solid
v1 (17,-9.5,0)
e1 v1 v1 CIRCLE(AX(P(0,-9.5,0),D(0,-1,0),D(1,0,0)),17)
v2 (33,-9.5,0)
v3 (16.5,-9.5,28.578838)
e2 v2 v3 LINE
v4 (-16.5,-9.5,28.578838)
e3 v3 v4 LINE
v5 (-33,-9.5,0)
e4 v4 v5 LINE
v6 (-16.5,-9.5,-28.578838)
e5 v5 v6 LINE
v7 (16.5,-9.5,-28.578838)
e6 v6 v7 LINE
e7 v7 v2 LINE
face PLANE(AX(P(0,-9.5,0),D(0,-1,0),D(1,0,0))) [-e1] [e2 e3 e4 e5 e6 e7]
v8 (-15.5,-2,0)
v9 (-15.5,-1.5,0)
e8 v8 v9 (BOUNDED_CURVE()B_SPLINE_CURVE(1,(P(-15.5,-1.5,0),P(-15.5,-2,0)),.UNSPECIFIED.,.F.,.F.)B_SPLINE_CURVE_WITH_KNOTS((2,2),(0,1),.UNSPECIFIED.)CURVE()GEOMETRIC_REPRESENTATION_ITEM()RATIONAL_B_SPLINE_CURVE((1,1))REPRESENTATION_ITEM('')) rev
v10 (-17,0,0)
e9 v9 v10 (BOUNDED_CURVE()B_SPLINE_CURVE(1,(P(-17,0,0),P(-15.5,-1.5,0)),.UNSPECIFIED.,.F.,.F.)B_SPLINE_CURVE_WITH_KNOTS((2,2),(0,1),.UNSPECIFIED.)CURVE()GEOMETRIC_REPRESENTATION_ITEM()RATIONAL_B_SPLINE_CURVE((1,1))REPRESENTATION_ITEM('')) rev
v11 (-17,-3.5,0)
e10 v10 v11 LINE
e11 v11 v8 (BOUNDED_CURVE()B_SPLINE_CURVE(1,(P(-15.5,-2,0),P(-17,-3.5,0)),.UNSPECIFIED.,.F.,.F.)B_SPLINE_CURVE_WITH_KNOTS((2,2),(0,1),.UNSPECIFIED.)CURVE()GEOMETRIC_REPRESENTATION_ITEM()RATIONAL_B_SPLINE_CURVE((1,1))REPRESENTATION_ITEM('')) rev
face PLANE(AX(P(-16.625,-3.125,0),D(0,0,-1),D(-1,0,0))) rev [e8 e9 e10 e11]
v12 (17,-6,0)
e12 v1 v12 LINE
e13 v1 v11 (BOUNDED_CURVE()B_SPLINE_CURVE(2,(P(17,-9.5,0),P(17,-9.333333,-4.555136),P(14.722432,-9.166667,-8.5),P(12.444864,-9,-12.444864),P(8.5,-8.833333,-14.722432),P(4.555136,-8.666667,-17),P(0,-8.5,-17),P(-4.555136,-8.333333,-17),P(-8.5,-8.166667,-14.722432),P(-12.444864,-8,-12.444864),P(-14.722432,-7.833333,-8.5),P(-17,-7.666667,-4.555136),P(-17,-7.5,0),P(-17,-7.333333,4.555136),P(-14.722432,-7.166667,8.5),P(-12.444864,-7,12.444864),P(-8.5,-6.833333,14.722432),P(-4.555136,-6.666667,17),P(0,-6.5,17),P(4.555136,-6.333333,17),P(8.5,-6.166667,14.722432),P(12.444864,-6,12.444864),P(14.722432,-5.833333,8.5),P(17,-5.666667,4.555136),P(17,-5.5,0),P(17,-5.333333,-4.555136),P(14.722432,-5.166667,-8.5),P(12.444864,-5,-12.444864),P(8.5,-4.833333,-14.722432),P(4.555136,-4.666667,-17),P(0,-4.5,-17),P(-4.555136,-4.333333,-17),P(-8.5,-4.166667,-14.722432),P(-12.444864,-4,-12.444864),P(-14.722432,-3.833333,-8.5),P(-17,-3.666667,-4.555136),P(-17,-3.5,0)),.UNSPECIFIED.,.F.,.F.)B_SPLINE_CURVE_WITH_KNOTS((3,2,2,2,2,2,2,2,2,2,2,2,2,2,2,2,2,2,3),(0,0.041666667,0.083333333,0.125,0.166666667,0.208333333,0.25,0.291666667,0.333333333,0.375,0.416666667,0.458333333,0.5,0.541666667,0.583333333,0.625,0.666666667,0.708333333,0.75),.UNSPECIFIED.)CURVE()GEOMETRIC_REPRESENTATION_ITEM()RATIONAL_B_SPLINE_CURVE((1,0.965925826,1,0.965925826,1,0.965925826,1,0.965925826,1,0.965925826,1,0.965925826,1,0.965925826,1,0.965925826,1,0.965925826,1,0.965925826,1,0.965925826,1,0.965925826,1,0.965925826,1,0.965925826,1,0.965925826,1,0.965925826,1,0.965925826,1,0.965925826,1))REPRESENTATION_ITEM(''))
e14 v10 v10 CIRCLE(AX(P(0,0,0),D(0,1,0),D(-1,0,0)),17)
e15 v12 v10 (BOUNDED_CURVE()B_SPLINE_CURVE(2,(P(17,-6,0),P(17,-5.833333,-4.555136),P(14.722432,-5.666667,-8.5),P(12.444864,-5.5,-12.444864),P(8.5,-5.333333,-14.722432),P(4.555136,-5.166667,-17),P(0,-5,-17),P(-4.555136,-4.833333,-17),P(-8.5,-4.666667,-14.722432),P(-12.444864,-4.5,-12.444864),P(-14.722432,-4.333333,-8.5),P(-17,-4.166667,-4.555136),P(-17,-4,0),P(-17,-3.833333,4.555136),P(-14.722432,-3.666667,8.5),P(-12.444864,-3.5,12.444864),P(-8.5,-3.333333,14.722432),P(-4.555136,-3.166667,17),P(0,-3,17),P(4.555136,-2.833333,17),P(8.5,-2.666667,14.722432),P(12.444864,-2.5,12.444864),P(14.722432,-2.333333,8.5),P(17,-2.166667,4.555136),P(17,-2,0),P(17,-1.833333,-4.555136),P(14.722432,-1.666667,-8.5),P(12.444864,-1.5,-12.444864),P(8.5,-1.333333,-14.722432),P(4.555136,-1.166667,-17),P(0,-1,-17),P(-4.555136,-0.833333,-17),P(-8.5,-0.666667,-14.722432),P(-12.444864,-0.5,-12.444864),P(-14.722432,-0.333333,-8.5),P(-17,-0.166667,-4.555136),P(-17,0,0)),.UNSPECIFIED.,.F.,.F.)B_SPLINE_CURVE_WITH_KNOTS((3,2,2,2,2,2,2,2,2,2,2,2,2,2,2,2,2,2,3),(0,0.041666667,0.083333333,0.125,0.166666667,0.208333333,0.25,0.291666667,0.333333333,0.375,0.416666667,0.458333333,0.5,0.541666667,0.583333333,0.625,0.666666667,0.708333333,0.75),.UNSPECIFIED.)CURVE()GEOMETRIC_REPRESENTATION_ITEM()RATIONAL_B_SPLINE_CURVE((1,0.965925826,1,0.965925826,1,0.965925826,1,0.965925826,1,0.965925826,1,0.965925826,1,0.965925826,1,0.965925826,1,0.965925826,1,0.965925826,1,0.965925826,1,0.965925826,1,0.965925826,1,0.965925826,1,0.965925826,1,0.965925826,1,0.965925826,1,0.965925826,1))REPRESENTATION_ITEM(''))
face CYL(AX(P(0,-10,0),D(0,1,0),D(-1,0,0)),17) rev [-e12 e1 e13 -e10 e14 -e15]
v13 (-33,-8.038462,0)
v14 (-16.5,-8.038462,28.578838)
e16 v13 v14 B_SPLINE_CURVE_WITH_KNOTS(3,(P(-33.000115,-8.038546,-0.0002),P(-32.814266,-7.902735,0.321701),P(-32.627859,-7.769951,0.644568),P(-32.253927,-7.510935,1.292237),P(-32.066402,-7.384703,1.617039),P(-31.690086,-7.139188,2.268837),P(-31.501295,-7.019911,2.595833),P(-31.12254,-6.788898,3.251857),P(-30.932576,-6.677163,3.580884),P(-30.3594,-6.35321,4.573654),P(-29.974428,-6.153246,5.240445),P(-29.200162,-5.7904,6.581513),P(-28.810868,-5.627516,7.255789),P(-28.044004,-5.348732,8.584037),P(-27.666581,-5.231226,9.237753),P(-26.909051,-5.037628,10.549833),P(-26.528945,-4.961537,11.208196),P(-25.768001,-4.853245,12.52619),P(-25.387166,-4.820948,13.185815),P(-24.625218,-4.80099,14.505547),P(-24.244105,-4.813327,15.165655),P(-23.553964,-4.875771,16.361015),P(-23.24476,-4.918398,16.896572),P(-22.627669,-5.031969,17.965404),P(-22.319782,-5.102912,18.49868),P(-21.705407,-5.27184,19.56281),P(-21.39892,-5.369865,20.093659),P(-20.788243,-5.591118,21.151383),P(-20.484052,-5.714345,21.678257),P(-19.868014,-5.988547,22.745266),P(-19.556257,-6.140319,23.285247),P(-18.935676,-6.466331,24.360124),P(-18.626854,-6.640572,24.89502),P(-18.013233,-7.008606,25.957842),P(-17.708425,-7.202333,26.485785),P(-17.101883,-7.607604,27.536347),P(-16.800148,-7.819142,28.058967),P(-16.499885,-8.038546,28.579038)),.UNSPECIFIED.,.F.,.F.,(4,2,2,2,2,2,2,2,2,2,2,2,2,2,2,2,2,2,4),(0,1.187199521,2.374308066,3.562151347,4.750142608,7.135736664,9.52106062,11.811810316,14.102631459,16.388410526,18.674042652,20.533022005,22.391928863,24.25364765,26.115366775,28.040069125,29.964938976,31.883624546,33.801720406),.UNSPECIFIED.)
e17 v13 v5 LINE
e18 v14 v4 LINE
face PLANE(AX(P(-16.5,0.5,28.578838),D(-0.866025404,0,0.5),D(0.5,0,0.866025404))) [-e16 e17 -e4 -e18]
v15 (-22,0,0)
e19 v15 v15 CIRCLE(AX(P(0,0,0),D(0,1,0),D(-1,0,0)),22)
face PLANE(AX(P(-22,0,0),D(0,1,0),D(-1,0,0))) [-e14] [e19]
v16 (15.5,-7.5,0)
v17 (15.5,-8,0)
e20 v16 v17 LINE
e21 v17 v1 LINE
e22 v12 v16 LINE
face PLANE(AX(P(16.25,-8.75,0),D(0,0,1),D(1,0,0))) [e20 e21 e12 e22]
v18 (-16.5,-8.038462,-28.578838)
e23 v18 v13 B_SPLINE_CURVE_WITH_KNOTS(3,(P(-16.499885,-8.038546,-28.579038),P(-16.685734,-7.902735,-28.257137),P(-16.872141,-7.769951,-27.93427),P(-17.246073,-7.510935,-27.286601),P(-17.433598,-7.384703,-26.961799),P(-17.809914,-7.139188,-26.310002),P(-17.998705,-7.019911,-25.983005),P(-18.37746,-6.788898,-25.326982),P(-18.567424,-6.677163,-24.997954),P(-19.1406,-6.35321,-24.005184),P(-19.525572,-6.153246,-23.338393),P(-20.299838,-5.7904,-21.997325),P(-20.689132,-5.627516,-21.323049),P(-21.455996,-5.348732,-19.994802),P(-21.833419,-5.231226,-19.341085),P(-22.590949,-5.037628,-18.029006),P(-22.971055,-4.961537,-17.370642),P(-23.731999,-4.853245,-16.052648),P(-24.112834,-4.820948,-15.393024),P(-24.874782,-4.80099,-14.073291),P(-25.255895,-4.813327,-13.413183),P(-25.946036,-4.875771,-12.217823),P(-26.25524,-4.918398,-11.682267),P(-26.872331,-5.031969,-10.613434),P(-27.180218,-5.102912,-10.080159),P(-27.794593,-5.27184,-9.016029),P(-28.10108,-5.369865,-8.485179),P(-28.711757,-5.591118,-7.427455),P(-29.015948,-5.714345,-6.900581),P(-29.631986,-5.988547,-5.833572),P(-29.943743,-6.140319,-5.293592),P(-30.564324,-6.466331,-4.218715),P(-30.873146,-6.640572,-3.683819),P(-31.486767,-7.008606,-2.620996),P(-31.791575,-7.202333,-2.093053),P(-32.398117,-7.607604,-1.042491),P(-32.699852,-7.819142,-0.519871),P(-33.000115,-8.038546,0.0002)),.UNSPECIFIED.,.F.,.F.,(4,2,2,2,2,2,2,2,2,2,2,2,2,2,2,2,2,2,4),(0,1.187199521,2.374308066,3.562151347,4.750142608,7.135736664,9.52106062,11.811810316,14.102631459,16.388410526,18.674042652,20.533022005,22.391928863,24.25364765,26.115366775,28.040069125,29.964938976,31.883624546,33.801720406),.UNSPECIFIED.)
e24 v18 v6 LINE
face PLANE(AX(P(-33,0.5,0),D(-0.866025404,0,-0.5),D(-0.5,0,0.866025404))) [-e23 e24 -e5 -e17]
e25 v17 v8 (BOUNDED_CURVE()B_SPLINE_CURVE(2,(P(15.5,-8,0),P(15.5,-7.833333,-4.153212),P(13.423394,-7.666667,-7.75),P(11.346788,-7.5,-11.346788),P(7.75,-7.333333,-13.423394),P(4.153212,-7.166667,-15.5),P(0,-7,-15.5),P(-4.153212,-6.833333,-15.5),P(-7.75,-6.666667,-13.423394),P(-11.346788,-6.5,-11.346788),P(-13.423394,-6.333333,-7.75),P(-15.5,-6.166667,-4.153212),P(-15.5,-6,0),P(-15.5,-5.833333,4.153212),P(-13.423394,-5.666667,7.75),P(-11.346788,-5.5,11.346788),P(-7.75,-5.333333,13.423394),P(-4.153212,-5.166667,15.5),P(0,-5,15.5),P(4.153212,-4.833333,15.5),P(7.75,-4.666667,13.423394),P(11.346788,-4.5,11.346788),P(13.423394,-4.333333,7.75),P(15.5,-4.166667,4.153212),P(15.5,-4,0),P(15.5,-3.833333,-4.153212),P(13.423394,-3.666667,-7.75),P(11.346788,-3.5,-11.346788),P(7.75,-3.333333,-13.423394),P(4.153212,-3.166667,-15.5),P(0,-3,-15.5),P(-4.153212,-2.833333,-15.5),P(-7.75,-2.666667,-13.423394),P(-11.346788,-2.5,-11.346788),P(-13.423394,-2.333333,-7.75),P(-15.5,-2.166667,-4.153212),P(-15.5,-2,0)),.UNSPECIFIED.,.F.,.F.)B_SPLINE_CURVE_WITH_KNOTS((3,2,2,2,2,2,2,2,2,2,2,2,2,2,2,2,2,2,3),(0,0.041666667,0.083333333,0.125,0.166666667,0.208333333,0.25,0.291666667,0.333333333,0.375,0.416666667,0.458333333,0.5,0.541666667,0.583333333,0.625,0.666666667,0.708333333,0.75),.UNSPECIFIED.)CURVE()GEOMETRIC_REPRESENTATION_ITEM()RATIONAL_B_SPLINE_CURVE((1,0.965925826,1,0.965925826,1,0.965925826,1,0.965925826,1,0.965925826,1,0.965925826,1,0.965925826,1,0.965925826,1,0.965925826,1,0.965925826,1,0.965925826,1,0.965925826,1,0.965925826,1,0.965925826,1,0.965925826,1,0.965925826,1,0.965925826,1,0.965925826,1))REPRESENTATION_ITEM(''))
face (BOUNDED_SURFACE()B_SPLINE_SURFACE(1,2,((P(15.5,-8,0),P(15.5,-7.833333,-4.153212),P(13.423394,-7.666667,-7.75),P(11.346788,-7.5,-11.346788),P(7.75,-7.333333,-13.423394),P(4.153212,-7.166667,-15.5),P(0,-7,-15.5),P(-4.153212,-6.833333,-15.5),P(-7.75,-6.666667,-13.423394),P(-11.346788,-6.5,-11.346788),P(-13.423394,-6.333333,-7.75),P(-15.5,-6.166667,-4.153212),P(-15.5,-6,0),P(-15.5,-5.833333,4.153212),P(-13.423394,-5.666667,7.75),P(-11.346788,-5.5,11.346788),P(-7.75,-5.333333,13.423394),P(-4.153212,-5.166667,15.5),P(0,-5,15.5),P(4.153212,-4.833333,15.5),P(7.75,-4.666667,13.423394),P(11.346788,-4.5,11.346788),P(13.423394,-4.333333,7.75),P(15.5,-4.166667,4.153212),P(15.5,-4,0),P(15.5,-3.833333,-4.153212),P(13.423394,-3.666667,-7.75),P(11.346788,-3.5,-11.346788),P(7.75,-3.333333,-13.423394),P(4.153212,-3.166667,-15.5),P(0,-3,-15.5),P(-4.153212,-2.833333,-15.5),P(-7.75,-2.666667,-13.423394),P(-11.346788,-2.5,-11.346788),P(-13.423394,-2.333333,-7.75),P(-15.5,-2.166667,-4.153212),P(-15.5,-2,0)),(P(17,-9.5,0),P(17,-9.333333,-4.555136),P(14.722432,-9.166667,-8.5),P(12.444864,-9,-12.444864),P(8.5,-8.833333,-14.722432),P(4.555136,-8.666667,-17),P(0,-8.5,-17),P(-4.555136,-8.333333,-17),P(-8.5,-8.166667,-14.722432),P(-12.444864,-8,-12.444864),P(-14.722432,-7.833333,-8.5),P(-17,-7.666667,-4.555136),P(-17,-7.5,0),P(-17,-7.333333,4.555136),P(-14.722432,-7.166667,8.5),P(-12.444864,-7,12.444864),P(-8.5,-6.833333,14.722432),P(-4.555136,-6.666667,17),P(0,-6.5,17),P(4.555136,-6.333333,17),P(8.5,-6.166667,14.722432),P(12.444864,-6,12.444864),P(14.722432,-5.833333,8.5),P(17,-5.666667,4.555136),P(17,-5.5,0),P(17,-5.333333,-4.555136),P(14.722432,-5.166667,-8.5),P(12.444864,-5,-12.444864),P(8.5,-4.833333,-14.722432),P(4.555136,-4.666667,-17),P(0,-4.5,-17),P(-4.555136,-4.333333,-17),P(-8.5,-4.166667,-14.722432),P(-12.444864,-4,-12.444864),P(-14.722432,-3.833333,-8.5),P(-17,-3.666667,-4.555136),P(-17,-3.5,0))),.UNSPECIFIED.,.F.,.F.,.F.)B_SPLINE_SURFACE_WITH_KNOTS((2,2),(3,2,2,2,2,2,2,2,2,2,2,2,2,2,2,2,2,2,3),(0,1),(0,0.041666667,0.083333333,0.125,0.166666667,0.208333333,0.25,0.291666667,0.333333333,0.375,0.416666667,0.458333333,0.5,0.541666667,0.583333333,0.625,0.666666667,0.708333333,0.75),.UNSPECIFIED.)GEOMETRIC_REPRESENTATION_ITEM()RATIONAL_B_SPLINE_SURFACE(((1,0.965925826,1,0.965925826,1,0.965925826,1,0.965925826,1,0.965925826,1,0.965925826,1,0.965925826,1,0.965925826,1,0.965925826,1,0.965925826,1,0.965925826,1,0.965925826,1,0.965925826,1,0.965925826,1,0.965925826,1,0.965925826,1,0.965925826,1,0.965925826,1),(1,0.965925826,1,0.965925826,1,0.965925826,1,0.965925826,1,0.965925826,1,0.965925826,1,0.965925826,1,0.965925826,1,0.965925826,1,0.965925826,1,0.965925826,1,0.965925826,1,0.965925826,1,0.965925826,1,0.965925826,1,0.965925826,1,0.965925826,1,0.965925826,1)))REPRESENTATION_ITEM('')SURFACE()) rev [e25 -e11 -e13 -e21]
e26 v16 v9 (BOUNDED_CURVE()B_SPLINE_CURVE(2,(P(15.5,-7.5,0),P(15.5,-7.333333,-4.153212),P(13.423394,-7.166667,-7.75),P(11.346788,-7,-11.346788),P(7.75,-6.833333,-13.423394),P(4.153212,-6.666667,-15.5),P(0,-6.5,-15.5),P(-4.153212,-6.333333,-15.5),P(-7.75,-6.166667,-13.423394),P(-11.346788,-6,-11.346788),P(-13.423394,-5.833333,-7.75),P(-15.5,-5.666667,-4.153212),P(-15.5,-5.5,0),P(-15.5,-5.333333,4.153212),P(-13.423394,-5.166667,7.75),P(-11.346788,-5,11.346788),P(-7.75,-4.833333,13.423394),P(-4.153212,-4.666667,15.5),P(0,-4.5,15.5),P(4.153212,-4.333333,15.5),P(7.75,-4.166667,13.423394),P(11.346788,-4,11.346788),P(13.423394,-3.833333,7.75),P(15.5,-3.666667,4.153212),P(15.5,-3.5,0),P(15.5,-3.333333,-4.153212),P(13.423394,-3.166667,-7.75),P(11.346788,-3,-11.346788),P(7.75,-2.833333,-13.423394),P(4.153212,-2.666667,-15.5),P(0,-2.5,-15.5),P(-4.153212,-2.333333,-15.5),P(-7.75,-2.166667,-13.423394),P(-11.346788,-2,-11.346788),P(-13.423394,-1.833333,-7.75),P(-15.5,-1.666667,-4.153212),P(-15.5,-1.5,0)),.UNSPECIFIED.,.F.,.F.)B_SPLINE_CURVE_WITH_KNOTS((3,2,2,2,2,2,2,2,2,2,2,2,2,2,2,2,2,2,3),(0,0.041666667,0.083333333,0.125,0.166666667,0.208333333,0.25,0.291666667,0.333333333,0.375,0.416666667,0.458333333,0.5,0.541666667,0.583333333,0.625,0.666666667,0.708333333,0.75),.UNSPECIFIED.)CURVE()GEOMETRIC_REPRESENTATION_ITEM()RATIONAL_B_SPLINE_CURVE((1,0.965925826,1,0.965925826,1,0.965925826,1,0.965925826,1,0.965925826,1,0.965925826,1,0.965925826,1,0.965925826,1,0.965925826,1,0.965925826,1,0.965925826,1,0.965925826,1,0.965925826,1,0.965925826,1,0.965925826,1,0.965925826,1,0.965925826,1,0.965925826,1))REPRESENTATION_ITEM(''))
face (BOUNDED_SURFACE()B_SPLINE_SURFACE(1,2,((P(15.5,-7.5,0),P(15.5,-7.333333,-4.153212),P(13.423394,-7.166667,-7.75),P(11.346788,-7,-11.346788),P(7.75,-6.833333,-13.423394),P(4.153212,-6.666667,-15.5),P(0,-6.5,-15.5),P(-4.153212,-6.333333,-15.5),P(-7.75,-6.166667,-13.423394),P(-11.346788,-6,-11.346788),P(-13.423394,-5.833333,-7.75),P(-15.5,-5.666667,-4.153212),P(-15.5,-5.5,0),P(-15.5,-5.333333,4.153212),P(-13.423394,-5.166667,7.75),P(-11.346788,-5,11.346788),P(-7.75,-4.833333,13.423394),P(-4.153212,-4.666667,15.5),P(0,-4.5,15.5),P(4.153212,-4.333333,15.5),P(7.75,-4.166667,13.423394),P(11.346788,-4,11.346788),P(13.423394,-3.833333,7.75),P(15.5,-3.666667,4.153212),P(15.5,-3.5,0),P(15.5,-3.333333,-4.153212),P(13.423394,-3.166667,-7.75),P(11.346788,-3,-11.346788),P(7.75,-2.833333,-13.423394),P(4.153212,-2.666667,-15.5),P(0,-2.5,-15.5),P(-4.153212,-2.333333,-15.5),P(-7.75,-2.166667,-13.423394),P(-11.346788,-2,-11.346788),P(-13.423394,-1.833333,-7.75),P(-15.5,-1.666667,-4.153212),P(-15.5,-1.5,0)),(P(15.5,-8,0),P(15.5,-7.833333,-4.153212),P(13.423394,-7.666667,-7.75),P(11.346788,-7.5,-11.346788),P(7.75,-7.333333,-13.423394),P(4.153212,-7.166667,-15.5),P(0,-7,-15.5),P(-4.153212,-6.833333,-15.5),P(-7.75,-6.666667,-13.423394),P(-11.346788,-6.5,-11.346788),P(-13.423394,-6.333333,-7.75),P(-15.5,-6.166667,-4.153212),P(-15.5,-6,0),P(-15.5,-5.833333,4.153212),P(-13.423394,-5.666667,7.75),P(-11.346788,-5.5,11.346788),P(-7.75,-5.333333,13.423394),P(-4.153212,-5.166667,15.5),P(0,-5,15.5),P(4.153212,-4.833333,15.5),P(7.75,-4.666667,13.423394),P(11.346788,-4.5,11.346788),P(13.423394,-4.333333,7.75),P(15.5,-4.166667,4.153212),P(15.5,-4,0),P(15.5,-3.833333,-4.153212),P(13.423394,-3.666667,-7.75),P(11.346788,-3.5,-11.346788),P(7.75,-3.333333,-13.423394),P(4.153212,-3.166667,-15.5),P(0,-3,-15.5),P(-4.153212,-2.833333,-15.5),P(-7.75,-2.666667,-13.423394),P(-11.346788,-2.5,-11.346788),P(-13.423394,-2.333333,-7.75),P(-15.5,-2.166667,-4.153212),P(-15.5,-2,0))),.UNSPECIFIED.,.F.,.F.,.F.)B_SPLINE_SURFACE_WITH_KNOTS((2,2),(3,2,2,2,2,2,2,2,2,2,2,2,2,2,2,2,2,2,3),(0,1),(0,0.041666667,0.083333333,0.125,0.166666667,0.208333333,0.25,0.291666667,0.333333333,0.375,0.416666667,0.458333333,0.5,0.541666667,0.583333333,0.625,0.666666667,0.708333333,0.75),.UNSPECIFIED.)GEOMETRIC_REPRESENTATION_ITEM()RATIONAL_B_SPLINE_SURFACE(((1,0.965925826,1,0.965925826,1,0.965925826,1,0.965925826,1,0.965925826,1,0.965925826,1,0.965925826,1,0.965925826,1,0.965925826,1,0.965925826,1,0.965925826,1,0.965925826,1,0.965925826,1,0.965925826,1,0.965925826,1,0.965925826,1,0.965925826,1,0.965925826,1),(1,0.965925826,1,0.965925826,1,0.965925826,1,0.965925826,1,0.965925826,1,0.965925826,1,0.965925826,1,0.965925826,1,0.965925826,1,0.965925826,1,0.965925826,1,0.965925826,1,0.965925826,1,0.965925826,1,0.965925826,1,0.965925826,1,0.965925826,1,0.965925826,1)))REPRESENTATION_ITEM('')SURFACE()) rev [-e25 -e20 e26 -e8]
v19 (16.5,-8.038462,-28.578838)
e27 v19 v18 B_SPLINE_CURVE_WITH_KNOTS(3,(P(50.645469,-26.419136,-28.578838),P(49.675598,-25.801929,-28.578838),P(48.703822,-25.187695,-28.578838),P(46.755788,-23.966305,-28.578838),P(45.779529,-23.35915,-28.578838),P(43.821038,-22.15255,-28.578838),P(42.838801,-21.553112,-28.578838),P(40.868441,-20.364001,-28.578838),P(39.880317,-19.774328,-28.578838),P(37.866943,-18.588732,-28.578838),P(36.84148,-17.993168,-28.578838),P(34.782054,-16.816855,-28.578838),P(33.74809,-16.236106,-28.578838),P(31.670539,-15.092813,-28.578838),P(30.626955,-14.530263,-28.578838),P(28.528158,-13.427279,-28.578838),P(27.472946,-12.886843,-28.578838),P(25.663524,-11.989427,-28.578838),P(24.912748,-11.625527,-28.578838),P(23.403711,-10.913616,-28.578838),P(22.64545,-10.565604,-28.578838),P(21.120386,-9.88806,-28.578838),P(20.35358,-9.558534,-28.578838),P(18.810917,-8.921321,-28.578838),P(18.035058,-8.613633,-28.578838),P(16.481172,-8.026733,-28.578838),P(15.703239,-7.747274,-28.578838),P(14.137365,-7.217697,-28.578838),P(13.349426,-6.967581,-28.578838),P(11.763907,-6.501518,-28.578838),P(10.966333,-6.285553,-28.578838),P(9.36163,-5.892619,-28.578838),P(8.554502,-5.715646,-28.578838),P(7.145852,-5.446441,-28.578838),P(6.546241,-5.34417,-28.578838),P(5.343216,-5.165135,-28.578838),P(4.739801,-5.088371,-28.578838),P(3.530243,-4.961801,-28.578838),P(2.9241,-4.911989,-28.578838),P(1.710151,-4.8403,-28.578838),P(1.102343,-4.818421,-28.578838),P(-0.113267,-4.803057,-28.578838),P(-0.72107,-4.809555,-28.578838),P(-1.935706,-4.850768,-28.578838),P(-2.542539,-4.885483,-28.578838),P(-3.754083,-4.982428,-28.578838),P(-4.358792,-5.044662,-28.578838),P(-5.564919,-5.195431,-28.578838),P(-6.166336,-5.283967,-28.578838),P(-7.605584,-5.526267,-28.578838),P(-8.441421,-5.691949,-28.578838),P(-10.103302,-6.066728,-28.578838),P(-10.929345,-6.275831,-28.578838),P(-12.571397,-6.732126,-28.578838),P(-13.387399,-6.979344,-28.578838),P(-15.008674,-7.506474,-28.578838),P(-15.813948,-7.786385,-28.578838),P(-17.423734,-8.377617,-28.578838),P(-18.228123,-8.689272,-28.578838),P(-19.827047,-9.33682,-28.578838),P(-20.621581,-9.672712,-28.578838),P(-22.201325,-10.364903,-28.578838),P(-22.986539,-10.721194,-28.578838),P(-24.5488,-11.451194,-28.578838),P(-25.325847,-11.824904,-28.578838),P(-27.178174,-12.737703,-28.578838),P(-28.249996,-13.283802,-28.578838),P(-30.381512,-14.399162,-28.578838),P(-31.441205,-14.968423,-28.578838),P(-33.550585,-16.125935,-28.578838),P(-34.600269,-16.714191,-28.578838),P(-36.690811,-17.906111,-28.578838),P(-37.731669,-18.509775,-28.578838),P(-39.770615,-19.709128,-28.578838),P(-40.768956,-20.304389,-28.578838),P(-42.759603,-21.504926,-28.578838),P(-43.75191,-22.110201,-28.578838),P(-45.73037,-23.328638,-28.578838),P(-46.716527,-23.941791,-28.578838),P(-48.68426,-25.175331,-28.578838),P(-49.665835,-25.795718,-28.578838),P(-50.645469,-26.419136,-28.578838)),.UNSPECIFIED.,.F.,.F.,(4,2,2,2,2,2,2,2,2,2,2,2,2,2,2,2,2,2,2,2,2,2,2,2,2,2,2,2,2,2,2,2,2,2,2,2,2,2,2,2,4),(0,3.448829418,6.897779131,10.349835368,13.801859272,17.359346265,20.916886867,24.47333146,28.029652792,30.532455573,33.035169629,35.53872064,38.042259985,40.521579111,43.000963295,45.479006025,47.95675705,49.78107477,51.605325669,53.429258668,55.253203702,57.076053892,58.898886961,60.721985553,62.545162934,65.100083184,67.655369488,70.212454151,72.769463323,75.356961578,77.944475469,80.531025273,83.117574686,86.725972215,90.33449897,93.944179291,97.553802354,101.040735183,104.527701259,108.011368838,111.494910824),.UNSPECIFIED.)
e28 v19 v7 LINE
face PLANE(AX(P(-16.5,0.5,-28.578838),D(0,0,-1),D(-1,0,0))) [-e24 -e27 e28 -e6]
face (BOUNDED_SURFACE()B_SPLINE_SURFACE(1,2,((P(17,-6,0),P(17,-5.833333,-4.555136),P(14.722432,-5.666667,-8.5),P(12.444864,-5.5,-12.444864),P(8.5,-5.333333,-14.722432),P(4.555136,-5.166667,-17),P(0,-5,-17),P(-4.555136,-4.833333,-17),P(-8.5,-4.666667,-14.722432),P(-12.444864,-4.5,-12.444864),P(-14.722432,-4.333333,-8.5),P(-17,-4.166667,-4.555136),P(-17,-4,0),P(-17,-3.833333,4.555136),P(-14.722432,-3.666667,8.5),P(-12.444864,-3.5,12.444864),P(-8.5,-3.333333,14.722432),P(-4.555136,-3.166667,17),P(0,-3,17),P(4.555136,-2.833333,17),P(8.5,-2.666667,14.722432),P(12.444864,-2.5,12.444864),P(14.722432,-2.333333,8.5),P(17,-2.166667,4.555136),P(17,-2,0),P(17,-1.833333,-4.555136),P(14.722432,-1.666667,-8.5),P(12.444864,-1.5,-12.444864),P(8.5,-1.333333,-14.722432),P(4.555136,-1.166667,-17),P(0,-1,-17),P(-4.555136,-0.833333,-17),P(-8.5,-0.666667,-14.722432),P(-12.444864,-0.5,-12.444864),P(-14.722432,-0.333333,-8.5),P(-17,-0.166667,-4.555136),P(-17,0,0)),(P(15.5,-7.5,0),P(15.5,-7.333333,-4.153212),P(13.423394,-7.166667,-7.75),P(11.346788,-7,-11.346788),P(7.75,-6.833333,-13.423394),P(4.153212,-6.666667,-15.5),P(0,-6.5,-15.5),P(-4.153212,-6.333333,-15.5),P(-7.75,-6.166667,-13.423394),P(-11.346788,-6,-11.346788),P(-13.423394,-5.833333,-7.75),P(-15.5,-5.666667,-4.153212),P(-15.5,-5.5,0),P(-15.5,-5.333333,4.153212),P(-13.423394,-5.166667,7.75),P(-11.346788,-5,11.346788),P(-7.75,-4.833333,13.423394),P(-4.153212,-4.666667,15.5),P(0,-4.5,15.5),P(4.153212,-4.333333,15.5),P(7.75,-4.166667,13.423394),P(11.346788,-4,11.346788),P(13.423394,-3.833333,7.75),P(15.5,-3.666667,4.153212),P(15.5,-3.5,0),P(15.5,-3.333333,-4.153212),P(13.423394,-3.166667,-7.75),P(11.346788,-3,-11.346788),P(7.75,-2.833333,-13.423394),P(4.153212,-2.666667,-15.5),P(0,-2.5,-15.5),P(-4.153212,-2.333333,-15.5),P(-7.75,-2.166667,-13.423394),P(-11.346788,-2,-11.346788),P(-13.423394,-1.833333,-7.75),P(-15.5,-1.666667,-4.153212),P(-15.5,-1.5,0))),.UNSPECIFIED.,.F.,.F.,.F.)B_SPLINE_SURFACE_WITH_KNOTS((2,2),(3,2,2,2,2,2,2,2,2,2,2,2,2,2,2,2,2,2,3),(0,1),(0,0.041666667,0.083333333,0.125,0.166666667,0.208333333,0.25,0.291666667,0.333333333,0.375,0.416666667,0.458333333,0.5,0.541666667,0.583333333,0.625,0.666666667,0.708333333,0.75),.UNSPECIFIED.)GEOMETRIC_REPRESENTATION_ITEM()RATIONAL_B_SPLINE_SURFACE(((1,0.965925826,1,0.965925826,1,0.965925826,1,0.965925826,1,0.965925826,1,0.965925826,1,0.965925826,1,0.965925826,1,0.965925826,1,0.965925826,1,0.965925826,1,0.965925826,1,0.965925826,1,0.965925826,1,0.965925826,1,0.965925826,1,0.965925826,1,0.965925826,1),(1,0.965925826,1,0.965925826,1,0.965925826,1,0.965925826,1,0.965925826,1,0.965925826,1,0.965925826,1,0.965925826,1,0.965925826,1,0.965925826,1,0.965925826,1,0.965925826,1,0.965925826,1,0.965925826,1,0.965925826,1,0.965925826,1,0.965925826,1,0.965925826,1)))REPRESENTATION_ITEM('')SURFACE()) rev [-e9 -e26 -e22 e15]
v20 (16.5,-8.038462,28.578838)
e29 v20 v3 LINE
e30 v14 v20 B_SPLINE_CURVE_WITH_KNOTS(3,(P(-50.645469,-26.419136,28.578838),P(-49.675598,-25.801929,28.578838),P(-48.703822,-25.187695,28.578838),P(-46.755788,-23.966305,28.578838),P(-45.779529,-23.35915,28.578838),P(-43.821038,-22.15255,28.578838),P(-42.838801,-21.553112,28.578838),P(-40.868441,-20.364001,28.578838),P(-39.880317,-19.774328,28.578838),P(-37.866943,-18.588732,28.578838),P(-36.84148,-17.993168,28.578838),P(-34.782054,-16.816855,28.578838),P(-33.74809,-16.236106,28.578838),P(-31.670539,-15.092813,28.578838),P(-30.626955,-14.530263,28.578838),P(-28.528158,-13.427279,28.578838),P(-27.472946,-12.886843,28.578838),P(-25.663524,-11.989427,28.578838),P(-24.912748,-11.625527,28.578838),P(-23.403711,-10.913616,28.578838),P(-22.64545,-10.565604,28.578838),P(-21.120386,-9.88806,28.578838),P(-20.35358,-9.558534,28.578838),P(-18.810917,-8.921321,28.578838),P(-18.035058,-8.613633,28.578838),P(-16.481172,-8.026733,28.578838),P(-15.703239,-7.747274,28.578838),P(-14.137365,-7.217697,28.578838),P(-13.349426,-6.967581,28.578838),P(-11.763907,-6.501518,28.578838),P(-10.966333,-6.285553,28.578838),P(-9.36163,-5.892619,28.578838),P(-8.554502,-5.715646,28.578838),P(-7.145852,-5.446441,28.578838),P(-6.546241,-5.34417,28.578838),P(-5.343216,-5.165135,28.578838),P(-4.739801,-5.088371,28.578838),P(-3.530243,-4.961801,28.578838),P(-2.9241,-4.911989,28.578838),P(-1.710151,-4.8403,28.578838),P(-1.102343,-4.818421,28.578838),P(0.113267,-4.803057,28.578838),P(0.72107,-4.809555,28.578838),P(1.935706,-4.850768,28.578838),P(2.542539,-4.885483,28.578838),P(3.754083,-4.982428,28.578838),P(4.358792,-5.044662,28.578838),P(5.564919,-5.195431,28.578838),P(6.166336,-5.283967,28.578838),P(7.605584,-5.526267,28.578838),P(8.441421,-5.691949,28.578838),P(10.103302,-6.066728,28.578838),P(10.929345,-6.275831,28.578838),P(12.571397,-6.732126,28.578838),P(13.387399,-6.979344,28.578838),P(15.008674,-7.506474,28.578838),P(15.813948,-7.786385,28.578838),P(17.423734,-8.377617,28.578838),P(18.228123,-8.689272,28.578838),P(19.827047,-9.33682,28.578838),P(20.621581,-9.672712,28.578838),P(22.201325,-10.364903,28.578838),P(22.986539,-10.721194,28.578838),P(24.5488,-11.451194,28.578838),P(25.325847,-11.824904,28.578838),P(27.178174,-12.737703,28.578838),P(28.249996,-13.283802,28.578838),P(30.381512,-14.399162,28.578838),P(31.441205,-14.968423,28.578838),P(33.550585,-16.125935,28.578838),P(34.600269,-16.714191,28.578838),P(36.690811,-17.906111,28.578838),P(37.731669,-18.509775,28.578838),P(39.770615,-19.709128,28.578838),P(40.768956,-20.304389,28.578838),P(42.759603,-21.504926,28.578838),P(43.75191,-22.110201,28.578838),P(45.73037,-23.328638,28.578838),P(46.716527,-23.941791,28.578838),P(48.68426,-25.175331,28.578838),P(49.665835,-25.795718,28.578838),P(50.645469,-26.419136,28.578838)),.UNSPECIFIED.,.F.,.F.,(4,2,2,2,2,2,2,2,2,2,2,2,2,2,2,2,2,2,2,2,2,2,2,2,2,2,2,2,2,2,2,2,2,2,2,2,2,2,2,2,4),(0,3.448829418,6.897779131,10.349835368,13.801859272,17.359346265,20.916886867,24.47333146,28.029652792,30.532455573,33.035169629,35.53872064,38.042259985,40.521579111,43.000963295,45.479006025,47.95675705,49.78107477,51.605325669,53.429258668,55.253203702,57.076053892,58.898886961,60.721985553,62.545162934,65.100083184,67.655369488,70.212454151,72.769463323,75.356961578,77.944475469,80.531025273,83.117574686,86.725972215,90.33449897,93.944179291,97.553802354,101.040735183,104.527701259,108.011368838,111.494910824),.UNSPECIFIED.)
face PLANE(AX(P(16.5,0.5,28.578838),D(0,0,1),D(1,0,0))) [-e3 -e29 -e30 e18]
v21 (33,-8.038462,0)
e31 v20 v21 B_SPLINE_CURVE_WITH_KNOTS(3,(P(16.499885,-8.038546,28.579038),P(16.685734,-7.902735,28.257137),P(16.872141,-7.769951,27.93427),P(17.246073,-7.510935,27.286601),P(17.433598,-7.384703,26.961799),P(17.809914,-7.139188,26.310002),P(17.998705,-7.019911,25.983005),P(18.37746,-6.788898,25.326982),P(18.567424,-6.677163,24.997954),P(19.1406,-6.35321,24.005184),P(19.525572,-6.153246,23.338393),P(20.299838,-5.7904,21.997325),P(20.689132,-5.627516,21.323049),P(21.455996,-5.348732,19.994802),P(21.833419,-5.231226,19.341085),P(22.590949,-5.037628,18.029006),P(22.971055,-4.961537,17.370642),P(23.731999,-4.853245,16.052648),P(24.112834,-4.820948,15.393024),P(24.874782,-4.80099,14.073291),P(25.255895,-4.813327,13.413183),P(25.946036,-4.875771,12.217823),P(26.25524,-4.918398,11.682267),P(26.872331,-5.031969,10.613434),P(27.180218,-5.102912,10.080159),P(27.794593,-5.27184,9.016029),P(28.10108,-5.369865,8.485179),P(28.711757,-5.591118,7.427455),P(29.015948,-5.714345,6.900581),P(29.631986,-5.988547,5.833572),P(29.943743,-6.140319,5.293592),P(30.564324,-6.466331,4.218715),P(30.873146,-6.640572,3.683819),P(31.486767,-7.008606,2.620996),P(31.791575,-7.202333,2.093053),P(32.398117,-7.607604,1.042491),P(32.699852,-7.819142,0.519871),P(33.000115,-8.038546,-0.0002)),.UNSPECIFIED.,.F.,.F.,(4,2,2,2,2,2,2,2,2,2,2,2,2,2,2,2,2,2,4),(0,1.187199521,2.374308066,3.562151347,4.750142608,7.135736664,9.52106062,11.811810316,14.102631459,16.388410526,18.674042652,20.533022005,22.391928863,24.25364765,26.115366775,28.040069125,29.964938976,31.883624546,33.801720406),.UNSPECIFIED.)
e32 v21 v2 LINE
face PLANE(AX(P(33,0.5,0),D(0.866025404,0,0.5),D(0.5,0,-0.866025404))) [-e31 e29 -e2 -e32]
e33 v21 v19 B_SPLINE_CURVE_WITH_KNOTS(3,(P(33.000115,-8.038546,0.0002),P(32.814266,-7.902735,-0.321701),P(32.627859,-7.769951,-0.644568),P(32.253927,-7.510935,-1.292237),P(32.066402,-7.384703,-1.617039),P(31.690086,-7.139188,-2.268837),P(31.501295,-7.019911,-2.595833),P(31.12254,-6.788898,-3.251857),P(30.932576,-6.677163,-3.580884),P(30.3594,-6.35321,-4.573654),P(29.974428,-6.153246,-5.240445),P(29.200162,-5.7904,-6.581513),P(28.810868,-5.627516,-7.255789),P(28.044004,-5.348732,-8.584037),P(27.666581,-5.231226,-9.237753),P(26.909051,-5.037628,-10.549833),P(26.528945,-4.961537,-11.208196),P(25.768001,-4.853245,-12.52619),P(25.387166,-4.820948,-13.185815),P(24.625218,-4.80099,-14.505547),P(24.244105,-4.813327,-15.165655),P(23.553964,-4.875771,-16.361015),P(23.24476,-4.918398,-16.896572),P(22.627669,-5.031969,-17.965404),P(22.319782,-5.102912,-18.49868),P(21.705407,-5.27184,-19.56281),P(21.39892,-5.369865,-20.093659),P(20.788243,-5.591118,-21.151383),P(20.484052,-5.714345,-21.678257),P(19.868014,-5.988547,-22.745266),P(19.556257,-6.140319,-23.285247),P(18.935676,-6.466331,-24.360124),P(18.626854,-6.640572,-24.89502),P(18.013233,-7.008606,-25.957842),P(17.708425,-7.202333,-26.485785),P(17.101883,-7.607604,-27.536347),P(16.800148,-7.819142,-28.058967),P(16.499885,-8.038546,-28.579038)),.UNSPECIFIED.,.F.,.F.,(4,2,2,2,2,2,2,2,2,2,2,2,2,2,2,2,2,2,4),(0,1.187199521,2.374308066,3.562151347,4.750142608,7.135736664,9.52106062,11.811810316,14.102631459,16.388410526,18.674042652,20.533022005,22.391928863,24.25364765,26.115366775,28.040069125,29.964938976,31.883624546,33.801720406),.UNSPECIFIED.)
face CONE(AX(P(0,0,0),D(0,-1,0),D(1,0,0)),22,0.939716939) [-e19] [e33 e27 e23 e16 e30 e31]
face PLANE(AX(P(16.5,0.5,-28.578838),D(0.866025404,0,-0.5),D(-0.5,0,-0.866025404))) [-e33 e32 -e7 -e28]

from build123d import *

# Parameters (mm, degrees)
SKETCH_4_R          = 17
CUT_EXTRUDE_2_DEPTH = 10
SWEEP_1_PITCH       = 4
SKETCH_12_W         = 1
SKETCH_12_H         = 0.730769231
SKETCH_13_R         = 34
CUT_EXTRUDE_3_DEPTH = 10


with BuildPart() as part:
    # 草图1 → 旋转1 (revolve)
    with BuildSketch(Plane.XY):
        Polygon((0, 0), (0, -9.5), (-35, -9.5), (-22, 0), align=None)
    revolve(axis=Axis((0, 0, 0), (0, -1, 0)))

    # 草图4 → 切除-拉伸2 (cut)
    with BuildSketch(Plane(origin=(0, 0, 0), x_dir=(1, 0, 0), z_dir=(0, 1, 0))):
        with Locations(Location((0, 0, 0), (0, 0, 180))):
            Circle(SKETCH_4_R)
    extrude(amount=-CUT_EXTRUDE_2_DEPTH, mode=Mode.SUBTRACT)

    # 扫描1: the profile of 草图7 profile screwed along a right-hand helix of 1.5 turns, 12 arcs to a turn; built about Z, then put on its axis
    sweep_1_z = Axis((0, 0, 0), (0, 0, 1))
    sweep_1_corners = [(17.0003, 0, 1.7503), (17.0003, 0, -1.7503), (15.5, 0, -0.25), (15.5, 0, 0.25)]
    with BuildLine(mode=Mode.PRIVATE) as sweep_1_profile:
        Line(sweep_1_corners[0], sweep_1_corners[1])
        Line(sweep_1_corners[1], sweep_1_corners[2])
        Line(sweep_1_corners[2], sweep_1_corners[3])
        Line(sweep_1_corners[3], sweep_1_corners[0])
    sweep_1_cap = Face(sweep_1_profile.wire())
    sweep_1_turn_angles = [0, 15, 30, 45, 60, 75, 90, 105, 120, 135, 150, 165, 180, 195, 210, 225, 240, 255, 270, 285, 300, 315, 330, 345, 360]
    sweep_1_turn_weights = [1, 0.9659258262890683, 1, 0.9659258262890683, 1, 0.9659258262890683, 1, 0.9659258262890683, 1, 0.9659258262890683, 1, 0.9659258262890683, 1, 0.9659258262890683, 1, 0.9659258262890683, 1, 0.9659258262890683, 1, 0.9659258262890683, 1, 0.9659258262890683, 1, 0.9659258262890683, 1]
    sweep_1_turn_rails = [Edge.make_bspline([Vector(p[0], p[1], 0).rotate(sweep_1_z, sweep_1_turn_angles[k]) / sweep_1_turn_weights[k] + Vector(0, 0, p[2] + SWEEP_1_PITCH * sweep_1_turn_angles[k] / 360) for k in range(25)], [0, 0, 0, 1, 1, 2, 2, 3, 3, 4, 4, 5, 5, 6, 6, 7, 7, 8, 8, 9, 9, 10, 10, 11, 11, 12, 12, 12], 2, sweep_1_turn_weights) for p in sweep_1_corners]
    sweep_1_turn_sides = [Face.make_surface_from_curves(sweep_1_turn_rails[p[0]], sweep_1_turn_rails[p[1]]) for p in [(0, 1), (1, 2), (2, 3), (3, 0)]]
    sweep_1_last_angles = [360, 375, 390, 405, 420, 435, 450, 465, 480, 495, 510, 525, 540]
    sweep_1_last_weights = [1, 0.9659258262890683, 1, 0.9659258262890683, 1, 0.9659258262890683, 1, 0.9659258262890683, 1, 0.9659258262890683, 1, 0.965925826289065, 1]
    sweep_1_last_rails = [Edge.make_bspline([Vector(p[0], p[1], 0).rotate(sweep_1_z, sweep_1_last_angles[k]) / sweep_1_last_weights[k] + Vector(0, 0, p[2] + SWEEP_1_PITCH * sweep_1_last_angles[k] / 360) for k in range(13)], [0, 0, 0, 1, 1, 2, 2, 3, 3, 4, 4, 5, 5, 6, 6, 6], 2, sweep_1_last_weights) for p in sweep_1_corners]
    sweep_1_last_sides = [Face.make_surface_from_curves(sweep_1_last_rails[p[0]], sweep_1_last_rails[p[1]]) for p in [(0, 1), (1, 2), (2, 3), (3, 0)]]
    sweep_1 = Plane(origin=(0, -7.75, 0), x_dir=(1, 0, 0), z_dir=(0, 1, 0)) * Solid(Shell([*sweep_1_turn_sides, *sweep_1_last_sides, sweep_1_cap, sweep_1_cap.rotate(sweep_1_z, 540).moved(Location((0, 0, SWEEP_1_PITCH * 540 / 360)))]))
    add(sweep_1)

    # 草图12 → 切除-旋转4 (revolve, cut)
    with BuildSketch(Plane(origin=(0, 0, 0), x_dir=(0, 0, -1), z_dir=(1, 0, 0)), mode=Mode.PRIVATE) as cut_revolve_4_sk:
        with Locations((-34.5, -9.134615384)):
            Rectangle(SKETCH_12_W, SKETCH_12_H)
    revolve(cut_revolve_4_sk.sketch.rotate(Axis((0, 0, 0), (0, 1, 0)), 180), axis=Axis((0, 0, 0), (0, 1, 0)), mode=Mode.SUBTRACT)

    # 草图13 → 切除-拉伸3 (cut)
    with BuildSketch(Plane.XZ.offset(9.5)):
        Circle(SKETCH_13_R)
        Polygon((-33, 0), (-16.5, -28.578838325), (16.5, -28.578838325), (33, 0), (16.5, 28.578838325), (-16.5, 28.578838325), align=None, mode=Mode.SUBTRACT)
    extrude(amount=-CUT_EXTRUDE_3_DEPTH, mode=Mode.SUBTRACT)


solid = part.part
